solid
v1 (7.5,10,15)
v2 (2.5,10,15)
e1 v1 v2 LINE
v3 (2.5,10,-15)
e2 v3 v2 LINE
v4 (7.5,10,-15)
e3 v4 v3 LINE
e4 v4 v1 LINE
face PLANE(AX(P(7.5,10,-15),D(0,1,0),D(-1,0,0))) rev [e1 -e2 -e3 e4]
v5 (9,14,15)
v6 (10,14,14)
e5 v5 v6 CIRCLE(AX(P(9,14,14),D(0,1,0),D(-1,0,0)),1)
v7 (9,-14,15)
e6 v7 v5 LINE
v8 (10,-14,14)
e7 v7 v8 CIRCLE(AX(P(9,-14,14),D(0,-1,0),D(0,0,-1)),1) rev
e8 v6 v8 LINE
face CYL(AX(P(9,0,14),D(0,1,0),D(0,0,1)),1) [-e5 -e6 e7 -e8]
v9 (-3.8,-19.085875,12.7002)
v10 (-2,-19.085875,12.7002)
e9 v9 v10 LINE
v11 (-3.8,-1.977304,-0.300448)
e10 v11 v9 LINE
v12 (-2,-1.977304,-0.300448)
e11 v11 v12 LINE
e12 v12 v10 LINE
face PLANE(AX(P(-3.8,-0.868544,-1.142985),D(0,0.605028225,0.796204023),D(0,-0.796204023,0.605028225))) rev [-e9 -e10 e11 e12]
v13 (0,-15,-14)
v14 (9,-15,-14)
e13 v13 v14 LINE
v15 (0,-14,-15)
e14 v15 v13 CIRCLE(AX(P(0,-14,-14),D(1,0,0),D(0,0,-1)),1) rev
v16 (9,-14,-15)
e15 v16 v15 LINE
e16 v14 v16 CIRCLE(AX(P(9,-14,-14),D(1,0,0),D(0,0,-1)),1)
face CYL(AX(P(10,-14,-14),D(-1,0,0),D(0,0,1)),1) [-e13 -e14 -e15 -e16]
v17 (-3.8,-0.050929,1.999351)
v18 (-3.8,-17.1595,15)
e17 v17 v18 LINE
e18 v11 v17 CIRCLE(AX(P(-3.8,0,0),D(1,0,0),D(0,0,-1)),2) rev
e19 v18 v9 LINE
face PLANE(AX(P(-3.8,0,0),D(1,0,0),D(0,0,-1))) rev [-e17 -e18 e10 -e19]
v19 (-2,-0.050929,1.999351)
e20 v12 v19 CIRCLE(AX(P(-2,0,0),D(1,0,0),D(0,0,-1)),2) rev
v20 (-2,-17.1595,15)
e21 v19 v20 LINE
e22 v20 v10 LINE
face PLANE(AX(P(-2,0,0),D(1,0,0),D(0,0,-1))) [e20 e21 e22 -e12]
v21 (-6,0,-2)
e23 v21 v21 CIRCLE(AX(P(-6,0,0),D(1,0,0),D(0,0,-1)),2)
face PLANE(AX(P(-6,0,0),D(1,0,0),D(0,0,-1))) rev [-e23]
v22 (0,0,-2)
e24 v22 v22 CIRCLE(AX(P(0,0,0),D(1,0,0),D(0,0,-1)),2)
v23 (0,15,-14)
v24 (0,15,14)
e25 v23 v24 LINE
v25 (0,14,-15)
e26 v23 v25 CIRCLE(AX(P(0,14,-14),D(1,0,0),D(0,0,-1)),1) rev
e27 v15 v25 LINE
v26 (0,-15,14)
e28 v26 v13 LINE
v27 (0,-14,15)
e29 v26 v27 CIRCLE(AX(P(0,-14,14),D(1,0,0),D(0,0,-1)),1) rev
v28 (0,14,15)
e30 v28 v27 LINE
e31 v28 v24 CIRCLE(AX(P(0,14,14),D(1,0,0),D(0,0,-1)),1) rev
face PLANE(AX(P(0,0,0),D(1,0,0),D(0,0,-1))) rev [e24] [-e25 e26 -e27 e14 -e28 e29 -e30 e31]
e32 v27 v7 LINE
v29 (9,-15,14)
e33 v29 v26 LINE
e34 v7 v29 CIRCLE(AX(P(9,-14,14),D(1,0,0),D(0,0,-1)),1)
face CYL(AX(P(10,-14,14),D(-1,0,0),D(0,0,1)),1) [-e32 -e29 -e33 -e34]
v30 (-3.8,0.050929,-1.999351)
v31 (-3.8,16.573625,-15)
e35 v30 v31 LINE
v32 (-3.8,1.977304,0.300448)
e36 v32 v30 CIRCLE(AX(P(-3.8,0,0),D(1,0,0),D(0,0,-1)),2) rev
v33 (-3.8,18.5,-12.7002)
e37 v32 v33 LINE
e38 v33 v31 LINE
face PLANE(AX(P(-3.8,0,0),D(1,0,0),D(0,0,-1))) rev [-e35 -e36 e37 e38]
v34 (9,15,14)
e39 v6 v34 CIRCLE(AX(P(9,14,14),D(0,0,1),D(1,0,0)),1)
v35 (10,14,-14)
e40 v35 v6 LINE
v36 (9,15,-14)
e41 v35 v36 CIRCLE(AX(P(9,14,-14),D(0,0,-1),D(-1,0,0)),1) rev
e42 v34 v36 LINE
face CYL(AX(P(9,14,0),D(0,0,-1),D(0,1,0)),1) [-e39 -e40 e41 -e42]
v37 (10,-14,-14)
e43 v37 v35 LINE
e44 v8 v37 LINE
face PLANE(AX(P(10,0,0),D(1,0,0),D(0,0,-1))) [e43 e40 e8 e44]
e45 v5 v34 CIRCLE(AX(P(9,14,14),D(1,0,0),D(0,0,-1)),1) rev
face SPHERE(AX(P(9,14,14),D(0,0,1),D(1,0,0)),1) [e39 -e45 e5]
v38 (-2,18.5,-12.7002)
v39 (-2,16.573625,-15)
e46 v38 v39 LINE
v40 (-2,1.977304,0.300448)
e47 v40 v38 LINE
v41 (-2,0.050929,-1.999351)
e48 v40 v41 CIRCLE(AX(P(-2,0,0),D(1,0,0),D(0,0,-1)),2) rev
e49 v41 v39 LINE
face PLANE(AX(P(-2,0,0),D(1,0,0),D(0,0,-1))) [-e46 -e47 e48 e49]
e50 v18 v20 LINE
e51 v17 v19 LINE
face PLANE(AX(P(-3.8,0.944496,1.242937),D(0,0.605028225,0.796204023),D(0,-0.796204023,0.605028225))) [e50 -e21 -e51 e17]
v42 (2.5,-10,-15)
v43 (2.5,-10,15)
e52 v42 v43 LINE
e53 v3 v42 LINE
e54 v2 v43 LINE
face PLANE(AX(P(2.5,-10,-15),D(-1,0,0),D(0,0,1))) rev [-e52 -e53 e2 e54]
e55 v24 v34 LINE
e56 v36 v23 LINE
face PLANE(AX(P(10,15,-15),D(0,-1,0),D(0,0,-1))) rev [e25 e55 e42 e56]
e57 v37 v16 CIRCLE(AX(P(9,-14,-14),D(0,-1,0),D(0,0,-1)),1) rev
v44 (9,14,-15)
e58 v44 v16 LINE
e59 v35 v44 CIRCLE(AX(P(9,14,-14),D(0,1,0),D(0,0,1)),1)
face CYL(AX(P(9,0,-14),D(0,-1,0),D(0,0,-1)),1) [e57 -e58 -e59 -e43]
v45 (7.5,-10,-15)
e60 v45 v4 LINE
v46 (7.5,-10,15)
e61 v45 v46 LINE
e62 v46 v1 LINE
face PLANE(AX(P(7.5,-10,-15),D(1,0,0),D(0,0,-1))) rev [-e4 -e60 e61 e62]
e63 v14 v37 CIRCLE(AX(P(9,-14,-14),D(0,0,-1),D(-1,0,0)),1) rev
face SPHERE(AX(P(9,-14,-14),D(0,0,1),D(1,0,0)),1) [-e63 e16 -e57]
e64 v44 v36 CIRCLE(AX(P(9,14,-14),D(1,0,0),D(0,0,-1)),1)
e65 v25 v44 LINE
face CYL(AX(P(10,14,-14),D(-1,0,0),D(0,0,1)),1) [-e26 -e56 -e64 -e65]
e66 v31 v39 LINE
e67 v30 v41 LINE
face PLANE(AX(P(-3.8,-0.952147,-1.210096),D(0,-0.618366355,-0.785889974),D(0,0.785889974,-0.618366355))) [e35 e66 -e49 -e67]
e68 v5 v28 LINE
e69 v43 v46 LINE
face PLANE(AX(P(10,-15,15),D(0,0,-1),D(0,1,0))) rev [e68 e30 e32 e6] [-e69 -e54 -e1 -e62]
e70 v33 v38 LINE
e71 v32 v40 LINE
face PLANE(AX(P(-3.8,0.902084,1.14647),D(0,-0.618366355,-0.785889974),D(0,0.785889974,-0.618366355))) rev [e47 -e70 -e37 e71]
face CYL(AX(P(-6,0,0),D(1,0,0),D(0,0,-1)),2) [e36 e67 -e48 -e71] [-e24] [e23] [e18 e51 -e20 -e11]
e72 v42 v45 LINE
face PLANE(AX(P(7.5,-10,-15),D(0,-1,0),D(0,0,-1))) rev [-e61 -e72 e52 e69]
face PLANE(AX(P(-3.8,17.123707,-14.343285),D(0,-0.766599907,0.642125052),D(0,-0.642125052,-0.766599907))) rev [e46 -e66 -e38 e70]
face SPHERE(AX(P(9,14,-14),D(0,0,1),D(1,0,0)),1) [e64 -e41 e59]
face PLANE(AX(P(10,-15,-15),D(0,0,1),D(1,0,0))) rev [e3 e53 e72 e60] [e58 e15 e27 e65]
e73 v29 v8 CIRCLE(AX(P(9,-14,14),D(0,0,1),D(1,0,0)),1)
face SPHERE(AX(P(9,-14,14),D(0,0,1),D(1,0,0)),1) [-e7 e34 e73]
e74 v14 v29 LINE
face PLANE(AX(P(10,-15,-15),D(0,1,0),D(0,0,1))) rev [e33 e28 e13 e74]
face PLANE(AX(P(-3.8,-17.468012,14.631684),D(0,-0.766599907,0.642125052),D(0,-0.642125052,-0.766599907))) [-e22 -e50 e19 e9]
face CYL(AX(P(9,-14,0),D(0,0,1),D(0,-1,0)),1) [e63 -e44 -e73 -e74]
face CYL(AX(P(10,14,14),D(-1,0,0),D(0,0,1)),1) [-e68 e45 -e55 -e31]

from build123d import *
from build123d.topology import SkipClean

# Parameters (mm, degrees)
SKETCH_2_R          = 2
EXTRUDE_1_DEPTH     = 6
EXTRUDE_2_DEPTH     = 1.8
SKETCH_6_W          = 30
SKETCH_6_H          = 30
EXTRUDE_3_DEPTH     = 10
SKETCH_7_W          = 5
SKETCH_7_H          = 20
CUT_EXTRUDE_1_DEPTH = 37.936034472
FILLET_1_R          = 1


with BuildPart() as part:
    # Эскиз2 → Бобышка-Вытянуть1 (new body)
    with BuildSketch(Plane(origin=(0, 0, 0), x_dir=(0, 0, -1), z_dir=(1, 0, 0))):
        Circle(SKETCH_2_R)
    extrude(amount=-EXTRUDE_1_DEPTH)

    # Эскиз5 → Бобышка-Вытянуть2 (add)
    with SkipClean():  # the faces are left unmerged after this step: merging them gives an invalid solid
        with BuildSketch(Plane(origin=(-2, 0, 0), x_dir=(0, 0, -1), z_dir=(1, 0, 0))):
            with BuildLine():
                Line((12.700200279, 18.5), (-0.300448261, 1.977303933))
                ThreePointArc((-0.300448261, 1.977303933), (-1.533199814, 1.284250104), (-1.99935146, -0.050928777))
                Line((-1.99935146, -0.050928777), (-15, -17.159500316))
                Line((-15, -17.159500316), (-12.700200279, -19.085875472))
                Line((-12.700200279, -19.085875472), (0.300448261, -1.977303933))
                ThreePointArc((0.300448261, -1.977303933), (1.533199814, -1.284250104), (1.99935146, 0.050928777))
                Line((1.99935146, 0.050928777), (15, 16.573624844))
                Line((15, 16.573624844), (12.700200279, 18.5))
            make_face()
        extrude(amount=-EXTRUDE_2_DEPTH)

    # Эскиз6 → Бобышка-Вытянуть3 (add)
    with BuildSketch(Plane(origin=(0, 0, 0), x_dir=(0, 0, -1), z_dir=(1, 0, 0))):
        Rectangle(SKETCH_6_W, SKETCH_6_H)
    extrude(amount=EXTRUDE_3_DEPTH)

    # Эскиз7 → Вырез-Вытянуть1 (cut, through all)
    with BuildSketch(Plane.XY.offset(15)):
        with Locations((5, 0)):
            Rectangle(SKETCH_7_W, SKETCH_7_H)
    extrude(amount=-CUT_EXTRUDE_1_DEPTH, mode=Mode.SUBTRACT)

    # Скругление1
    fillet_1_edges = [part.edges().sort_by_distance(p)[0] for p in [
        (5, 15, 15),
        (5, 15, -15),
        (10, -15, 0),
        (5, -15, -15),
        (5, -15, 15),
        (10, 0, -15),
        (10, 0, 15),
        (10, 15, 0),
    ]]
    fillet(fillet_1_edges, radius=FILLET_1_R)


solid = part.part
